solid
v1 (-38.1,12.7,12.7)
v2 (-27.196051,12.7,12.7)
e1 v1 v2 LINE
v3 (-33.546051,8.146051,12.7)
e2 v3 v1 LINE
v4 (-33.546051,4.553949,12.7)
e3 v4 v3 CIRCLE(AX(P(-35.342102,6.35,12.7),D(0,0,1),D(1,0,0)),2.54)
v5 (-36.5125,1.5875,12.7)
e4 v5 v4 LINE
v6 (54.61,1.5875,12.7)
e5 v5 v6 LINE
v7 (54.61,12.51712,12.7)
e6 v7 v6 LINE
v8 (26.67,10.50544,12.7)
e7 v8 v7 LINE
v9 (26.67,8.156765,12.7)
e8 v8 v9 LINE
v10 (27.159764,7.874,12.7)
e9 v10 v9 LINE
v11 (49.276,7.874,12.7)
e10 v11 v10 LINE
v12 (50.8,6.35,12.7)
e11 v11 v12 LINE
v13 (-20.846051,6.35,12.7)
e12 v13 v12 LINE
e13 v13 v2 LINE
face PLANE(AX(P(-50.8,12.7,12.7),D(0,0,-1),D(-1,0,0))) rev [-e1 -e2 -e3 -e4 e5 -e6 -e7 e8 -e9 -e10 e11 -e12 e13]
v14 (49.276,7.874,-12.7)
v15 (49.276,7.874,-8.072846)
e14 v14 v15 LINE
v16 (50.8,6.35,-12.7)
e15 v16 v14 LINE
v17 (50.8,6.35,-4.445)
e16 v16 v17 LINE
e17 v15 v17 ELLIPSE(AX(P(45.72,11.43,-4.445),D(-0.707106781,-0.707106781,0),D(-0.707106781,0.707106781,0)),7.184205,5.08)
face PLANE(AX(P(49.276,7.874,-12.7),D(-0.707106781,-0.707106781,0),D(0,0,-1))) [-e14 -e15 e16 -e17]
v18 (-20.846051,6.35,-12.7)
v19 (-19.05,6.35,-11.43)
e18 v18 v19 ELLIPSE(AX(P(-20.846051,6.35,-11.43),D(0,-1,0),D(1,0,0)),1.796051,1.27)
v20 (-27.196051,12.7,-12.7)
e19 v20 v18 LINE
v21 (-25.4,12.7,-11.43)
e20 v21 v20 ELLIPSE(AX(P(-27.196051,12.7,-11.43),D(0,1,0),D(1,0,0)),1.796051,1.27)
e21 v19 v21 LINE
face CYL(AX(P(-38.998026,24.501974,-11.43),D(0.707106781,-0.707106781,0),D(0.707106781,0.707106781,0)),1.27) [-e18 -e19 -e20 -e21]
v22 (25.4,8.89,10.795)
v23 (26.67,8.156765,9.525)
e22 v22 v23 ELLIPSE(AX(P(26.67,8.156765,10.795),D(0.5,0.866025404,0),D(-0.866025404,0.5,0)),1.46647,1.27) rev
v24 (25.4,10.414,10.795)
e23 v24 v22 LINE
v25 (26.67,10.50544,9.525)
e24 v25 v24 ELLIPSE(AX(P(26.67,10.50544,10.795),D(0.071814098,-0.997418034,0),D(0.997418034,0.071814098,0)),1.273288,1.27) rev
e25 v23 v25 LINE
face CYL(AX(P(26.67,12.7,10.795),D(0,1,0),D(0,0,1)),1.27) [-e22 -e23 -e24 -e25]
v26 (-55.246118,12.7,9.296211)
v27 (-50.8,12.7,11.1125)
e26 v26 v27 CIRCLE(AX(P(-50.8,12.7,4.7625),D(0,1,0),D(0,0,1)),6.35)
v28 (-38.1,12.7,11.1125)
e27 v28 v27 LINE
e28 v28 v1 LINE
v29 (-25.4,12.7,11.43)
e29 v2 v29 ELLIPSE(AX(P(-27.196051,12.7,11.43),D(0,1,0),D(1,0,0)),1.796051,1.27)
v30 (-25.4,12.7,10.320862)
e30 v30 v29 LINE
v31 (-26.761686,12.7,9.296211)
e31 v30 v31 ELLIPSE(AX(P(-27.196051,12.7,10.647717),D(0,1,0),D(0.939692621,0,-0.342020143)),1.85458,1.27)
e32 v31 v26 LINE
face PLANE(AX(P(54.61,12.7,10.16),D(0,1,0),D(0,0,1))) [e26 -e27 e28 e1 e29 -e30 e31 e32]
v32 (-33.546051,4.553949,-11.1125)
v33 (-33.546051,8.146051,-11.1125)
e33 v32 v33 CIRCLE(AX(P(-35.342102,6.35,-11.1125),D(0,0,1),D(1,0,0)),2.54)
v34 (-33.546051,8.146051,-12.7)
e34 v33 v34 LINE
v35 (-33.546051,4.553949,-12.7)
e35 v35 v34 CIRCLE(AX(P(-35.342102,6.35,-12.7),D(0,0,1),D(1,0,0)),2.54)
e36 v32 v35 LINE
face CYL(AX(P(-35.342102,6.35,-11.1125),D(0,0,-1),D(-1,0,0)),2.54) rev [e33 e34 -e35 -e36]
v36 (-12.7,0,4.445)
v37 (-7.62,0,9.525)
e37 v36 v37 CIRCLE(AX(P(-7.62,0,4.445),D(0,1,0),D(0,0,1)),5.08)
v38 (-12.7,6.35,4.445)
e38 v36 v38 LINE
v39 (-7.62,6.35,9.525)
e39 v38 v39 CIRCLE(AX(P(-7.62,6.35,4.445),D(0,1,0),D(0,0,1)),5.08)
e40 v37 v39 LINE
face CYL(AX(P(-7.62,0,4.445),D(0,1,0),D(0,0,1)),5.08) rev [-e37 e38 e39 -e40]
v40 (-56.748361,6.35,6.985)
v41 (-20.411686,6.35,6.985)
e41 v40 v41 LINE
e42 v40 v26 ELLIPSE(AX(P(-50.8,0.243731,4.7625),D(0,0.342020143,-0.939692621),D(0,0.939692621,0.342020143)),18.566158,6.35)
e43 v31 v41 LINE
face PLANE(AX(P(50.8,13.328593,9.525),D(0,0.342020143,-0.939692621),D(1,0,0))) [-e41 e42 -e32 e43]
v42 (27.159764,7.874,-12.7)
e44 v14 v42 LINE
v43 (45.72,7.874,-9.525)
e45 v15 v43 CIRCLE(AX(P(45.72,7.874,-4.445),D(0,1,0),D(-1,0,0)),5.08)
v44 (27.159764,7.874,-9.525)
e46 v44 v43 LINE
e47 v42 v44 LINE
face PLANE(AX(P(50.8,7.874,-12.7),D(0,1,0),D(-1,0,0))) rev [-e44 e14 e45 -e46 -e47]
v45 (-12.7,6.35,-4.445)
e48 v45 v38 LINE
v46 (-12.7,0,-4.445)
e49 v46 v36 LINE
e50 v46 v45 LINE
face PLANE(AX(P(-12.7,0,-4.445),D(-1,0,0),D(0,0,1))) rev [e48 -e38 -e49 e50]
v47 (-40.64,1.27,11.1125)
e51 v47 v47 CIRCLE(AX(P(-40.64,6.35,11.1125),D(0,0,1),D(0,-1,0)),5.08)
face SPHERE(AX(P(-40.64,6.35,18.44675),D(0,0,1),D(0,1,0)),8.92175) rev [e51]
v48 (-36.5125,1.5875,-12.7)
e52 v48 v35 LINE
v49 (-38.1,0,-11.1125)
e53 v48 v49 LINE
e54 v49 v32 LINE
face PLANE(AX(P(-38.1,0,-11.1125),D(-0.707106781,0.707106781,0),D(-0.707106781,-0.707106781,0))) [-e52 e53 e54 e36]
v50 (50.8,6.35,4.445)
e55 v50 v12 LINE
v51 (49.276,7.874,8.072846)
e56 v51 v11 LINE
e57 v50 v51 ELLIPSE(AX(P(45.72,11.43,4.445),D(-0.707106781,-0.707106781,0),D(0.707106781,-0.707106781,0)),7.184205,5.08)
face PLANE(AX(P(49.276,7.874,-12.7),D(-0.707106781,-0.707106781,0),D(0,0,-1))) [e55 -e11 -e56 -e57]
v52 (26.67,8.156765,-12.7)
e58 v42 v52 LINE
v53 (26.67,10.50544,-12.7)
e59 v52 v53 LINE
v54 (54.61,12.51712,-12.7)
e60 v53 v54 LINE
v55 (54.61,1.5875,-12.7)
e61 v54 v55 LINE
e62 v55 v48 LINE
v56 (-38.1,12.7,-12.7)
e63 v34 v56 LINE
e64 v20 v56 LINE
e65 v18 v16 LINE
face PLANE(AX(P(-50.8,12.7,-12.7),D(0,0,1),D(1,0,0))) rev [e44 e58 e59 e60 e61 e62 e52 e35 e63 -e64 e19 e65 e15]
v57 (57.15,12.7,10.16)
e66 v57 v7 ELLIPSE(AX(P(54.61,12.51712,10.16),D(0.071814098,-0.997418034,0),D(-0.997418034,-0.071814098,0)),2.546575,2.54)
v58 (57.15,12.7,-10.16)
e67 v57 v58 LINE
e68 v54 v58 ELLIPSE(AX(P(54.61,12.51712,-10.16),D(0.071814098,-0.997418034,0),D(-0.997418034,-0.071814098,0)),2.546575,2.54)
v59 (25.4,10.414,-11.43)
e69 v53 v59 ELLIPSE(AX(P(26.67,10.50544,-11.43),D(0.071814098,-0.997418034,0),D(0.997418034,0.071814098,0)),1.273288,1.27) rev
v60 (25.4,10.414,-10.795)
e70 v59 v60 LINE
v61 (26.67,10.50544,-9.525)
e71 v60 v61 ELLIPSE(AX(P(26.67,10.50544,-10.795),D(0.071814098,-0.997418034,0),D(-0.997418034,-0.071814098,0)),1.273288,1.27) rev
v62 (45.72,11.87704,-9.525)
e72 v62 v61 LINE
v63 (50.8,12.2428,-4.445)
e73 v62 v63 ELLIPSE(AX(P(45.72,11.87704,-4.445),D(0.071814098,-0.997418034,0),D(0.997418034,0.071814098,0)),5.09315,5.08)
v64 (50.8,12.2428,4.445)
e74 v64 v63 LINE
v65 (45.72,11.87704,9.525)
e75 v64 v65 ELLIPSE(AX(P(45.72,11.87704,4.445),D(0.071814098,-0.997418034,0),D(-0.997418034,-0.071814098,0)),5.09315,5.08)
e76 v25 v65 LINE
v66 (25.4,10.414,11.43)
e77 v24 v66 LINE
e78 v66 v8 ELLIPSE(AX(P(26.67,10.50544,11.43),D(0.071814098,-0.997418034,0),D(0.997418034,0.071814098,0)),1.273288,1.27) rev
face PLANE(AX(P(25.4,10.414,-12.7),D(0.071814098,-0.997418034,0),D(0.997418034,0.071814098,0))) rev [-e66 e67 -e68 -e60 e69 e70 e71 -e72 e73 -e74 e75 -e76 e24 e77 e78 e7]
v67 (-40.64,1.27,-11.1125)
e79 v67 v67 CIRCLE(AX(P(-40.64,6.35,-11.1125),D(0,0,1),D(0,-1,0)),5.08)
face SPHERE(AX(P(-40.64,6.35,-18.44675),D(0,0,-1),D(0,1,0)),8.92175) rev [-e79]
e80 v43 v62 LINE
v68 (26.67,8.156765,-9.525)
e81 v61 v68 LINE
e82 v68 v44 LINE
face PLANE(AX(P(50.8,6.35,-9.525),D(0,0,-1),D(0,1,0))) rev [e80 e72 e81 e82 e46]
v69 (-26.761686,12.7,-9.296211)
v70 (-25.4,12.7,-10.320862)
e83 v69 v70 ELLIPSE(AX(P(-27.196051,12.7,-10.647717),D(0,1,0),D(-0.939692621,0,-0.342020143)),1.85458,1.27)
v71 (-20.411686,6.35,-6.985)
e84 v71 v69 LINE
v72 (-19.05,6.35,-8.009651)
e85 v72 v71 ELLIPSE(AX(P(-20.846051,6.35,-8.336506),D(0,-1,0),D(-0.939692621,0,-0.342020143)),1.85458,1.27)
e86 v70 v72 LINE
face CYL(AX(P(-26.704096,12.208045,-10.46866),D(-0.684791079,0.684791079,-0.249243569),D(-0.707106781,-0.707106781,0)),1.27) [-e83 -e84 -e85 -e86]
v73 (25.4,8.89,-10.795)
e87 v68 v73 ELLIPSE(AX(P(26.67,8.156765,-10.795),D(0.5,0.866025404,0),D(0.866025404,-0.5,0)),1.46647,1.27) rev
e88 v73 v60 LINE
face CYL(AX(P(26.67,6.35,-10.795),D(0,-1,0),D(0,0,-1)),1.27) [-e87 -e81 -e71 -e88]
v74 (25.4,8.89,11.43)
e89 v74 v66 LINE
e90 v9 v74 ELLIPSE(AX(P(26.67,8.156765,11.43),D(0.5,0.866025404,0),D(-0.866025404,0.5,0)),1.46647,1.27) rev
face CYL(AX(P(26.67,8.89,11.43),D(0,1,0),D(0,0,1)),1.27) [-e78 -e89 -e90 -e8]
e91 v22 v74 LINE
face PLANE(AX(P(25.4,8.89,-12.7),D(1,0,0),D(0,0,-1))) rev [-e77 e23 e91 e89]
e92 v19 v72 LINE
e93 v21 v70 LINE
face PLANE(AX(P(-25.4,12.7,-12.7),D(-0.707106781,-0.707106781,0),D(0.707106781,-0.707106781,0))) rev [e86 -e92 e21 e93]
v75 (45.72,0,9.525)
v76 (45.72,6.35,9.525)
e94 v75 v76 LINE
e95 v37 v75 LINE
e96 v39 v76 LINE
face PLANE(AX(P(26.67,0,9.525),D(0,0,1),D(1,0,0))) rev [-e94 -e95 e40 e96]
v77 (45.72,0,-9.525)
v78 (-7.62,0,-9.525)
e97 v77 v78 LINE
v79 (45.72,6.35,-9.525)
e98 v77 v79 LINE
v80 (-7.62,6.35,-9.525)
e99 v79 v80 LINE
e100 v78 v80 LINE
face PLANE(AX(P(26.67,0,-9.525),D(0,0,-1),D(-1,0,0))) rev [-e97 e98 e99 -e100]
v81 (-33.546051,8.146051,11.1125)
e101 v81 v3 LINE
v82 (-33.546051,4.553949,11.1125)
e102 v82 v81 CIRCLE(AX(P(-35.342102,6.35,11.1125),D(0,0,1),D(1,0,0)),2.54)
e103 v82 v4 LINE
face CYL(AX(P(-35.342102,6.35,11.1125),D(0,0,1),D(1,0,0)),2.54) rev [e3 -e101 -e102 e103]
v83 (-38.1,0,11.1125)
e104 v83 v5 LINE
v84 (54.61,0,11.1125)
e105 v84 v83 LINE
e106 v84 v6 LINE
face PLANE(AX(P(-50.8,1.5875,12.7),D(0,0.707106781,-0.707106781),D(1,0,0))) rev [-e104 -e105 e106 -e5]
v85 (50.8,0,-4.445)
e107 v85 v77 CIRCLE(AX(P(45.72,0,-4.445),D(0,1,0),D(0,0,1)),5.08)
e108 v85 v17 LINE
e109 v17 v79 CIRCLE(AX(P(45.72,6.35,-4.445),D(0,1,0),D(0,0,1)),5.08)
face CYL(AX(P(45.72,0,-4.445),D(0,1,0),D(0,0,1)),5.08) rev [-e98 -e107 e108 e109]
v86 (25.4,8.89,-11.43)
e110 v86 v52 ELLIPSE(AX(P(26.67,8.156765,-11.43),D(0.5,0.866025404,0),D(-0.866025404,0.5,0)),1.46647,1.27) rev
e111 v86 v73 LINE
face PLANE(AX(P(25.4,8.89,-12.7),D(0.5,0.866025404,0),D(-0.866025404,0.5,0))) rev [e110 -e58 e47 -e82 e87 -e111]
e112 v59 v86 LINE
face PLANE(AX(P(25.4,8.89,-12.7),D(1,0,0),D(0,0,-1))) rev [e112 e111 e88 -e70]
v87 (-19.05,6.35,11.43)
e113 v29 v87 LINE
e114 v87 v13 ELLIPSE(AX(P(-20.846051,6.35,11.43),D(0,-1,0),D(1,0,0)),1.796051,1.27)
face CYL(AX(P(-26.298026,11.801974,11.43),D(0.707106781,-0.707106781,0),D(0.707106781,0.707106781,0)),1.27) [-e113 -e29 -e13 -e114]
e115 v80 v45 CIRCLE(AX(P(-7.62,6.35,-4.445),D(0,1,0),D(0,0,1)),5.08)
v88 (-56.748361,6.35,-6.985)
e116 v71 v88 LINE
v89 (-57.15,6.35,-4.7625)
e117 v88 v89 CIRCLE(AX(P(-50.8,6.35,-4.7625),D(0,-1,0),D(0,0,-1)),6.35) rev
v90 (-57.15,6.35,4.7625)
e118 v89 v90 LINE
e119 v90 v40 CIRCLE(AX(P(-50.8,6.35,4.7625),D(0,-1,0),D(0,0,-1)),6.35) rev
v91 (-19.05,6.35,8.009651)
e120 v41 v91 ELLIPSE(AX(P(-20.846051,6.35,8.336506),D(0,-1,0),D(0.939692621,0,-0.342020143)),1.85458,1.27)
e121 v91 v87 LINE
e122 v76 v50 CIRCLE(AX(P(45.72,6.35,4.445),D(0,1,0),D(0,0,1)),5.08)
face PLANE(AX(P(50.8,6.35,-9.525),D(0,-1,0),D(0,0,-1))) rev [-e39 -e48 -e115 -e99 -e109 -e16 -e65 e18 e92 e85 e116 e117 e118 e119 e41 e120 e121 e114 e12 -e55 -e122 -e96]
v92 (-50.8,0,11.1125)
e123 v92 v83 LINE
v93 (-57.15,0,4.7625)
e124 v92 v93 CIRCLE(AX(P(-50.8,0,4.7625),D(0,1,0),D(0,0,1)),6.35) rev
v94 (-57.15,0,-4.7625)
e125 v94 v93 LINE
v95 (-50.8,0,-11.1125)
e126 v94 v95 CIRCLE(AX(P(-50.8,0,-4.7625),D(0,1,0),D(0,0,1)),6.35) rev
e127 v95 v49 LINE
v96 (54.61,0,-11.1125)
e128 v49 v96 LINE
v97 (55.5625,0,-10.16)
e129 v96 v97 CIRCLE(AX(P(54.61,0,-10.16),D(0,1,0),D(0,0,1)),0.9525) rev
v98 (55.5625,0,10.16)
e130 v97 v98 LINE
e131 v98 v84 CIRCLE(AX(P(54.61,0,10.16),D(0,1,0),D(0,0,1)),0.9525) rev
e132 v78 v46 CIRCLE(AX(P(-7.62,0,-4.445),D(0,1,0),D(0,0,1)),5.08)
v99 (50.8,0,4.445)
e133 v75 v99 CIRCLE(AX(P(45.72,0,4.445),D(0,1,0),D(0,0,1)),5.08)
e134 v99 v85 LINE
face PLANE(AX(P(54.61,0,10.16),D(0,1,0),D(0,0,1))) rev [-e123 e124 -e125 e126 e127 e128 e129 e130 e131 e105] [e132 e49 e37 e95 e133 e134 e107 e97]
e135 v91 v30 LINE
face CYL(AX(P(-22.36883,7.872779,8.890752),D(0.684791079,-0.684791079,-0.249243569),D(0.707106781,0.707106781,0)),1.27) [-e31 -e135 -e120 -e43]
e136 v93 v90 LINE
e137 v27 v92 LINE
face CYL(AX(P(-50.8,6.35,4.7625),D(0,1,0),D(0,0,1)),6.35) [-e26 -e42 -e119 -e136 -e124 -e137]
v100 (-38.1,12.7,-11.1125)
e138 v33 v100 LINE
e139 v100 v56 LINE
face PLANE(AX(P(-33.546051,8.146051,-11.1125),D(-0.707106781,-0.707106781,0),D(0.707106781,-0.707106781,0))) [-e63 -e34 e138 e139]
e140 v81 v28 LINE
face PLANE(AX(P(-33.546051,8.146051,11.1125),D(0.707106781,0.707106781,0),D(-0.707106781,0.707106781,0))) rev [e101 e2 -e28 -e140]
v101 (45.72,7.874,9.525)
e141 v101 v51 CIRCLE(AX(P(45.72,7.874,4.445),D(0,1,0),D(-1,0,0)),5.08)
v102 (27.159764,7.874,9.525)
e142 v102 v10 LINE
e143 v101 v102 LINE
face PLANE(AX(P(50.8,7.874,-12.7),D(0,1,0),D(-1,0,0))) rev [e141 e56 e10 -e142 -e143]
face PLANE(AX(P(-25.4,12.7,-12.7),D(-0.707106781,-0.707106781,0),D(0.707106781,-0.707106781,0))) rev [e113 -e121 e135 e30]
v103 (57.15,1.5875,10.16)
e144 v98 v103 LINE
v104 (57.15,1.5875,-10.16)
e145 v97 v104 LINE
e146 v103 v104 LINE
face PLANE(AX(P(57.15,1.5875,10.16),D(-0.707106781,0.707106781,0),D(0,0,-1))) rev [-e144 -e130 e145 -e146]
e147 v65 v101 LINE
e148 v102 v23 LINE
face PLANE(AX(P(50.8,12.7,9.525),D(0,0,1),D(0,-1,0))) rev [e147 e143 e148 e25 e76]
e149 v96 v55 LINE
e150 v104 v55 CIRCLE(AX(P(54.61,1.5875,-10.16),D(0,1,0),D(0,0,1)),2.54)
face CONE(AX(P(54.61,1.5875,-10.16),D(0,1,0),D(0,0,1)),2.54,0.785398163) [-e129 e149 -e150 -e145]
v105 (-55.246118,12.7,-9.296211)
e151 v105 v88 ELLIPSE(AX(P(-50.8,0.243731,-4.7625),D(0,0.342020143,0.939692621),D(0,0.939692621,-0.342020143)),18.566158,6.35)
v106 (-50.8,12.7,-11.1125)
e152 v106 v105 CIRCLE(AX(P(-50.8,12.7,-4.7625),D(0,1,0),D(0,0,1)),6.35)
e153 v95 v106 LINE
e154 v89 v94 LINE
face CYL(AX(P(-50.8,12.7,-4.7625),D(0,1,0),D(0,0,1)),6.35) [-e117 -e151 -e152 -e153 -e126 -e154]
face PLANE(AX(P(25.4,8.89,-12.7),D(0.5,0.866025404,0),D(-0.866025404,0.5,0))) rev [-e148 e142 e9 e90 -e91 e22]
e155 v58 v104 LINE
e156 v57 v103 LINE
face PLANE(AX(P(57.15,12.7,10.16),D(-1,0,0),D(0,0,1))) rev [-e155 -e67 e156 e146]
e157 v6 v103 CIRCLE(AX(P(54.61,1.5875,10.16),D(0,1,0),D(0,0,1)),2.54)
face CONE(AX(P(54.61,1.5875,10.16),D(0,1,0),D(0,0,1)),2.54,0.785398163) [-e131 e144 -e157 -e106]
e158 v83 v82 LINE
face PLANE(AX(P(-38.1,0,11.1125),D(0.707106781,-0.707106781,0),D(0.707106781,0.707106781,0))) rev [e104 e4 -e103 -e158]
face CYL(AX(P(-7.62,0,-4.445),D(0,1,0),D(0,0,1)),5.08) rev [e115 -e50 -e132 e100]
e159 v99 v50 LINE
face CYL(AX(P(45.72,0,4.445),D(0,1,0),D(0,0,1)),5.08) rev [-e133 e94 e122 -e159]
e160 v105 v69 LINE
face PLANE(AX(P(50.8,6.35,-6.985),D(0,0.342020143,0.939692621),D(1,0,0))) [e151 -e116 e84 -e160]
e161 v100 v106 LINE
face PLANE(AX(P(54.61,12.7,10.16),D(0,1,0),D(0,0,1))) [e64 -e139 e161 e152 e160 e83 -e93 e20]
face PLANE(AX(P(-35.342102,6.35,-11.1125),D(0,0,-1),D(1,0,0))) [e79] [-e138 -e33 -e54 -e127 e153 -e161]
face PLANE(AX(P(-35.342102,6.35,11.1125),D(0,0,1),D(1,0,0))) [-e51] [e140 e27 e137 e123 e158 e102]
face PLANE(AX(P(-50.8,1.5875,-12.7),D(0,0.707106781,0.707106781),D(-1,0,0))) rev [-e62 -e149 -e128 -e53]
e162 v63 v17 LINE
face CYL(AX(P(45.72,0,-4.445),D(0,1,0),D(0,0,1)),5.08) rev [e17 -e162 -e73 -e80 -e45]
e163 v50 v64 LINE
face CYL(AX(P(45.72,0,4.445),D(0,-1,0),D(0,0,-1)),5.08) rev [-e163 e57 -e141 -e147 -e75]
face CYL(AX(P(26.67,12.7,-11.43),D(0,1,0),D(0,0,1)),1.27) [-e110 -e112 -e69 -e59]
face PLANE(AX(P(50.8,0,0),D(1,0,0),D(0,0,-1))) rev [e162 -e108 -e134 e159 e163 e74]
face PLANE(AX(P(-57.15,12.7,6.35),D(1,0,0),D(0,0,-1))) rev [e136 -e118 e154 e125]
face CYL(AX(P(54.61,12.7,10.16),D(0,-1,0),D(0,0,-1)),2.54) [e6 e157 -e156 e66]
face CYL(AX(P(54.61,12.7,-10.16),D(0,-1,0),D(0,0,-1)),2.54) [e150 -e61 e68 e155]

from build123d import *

# Parameters (mm, degrees)
BOSS_EXTRUDE1_DEPTH = 12.7
SKETCH2_W           = 19.05
SKETCH2_H           = 6.35
CUT_EXTRUDE1_DEPTH  = 107.95
CUT_EXTRUDE2_DEPTH  = 64.816710194
CHAMFER1_SIZE       = 6.978592645
CHAMFER1_SIZE_2     = 2.54
CUT_EXTRUDE3_DEPTH  = 1.5875
CHAMFER3_SIZE       = 1.5875
FILLET1_R           = 6.35
FILLET2_R           = 1.27
FILLET3_R           = 5.08
CHAMFER4_SIZE       = 1.524
CUT_EXTRUDE4_DEPTH  = 59.887477446


# Some blends are built 0.0001 mm under size
with BuildPart() as part:
    # Sketch1 → Boss-Extrude1 (new body)
    with BuildSketch(Plane(origin=(0, 0, 0), x_dir=(1, 0, 0), z_dir=(0, 1, 0))):
        with BuildLine():
            Line((-50.8, 12.7), (-57.15, 12.7))
            Line((-57.15, 12.7), (-57.15, 6.35))
            Line((-57.15, 6.35), (-57.15, -6.35))
            Line((-57.15, -6.35), (-57.15, -12.7))
            Line((-57.15, -12.7), (-50.8, -12.7))
            Line((-50.8, -12.7), (54.61, -12.7))
            ThreePointArc((54.61, -12.7), (56.406051224, -11.956051224), (57.15, -10.16))
            Line((57.15, -10.16), (57.15, 10.16))
            ThreePointArc((57.15, 10.16), (56.406051224, 11.956051224), (54.61, 12.7))
            Line((54.61, 12.7), (-50.8, 12.7))
        make_face()
    extrude(amount=BOSS_EXTRUDE1_DEPTH)

    # Sketch2 → Cut-Extrude1 (cut)
    with BuildSketch(Plane.ZY.offset(57.15)):
        with Locations((0, 9.525)):
            Rectangle(SKETCH2_W, SKETCH2_H)
    extrude(amount=-CUT_EXTRUDE1_DEPTH, mode=Mode.SUBTRACT)

    # Sketch3 → Cut-Extrude2 (cut, through all)
    with BuildSketch(Plane.XY.offset(12.7)):
        Polygon((25.4, 10.414), (57.15, 12.7), (-25.4, 12.7), (-19.05, 6.35), (50.8, 6.35), (50.8, 7.874), (27.15976362, 7.874), (25.4, 8.89), align=None)
    extrude(amount=-CUT_EXTRUDE2_DEPTH, mode=Mode.SUBTRACT)

    # Chamfer1
    # the kernel refuses this chamfer: 6.978592645, 2.54 mm, written as the material it adds along each edge
    with BuildSketch(Plane(origin=(-57.15, 6.35, 9.525), x_dir=(0, 0.9999130865277316, 0.013184058198642549), z_dir=(1, 0, 0))) as chamfer1_piece_1_section:
        Polygon((CHAMFER1_SIZE * 0.999913086587, -CHAMFER1_SIZE * 0.0131840581994), (-CHAMFER1_SIZE_2 * 0.0131840581987, -CHAMFER1_SIZE_2 * 0.999913086528), (0, 0), align=None)
    chamfer1_piece_1 = extrude(amount=56.203828281, mode=Mode.PRIVATE)
    chamfer1_piece_1 = split(chamfer1_piece_1, bisect_by=Plane(origin=(-39.199121236, 12.7, 8.706690515), z_dir=(0, -1, 0)), keep=Keep.TOP, mode=Mode.PRIVATE)
    chamfer1_piece_1 = split(chamfer1_piece_1, bisect_by=Plane(origin=(-30.223681853, 17.523681853, 8.706690515), z_dir=(-0.7071067811865448, -0.7071067811865503, 0)), keep=Keep.TOP, mode=Mode.PRIVATE)
    add(chamfer1_piece_1)
    with BuildSketch(Plane(origin=(-57.15, 6.35, -9.525), x_dir=(0, -0.09904090225207035, 0.9950833631817466), z_dir=(1, 0, 0))) as chamfer1_piece_2_section:
        Polygon((CHAMFER1_SIZE_2 * 0.995083363182, -CHAMFER1_SIZE_2 * 0.099040902252), (-CHAMFER1_SIZE * 0.099040902258, -CHAMFER1_SIZE * 0.995083363241), (0, 0), align=None)
    chamfer1_piece_2 = extrude(amount=56.203828281, mode=Mode.PRIVATE)
    chamfer1_piece_2 = split(chamfer1_piece_2, bisect_by=Plane(origin=(-30.223681853, 17.523681853, -8.706690515), z_dir=(-0.7071067811865448, -0.7071067811865503, 0)), keep=Keep.TOP, mode=Mode.PRIVATE)
    chamfer1_piece_2 = split(chamfer1_piece_2, bisect_by=Plane(origin=(-39.199121236, 12.7, -8.706690515), z_dir=(0, -1, 0)), keep=Keep.TOP, mode=Mode.PRIVATE)
    add(chamfer1_piece_2)

    # Sketch4 → Cut-Extrude3 (cut)
    with BuildSketch(Plane.XY.offset(12.7)):
        with BuildLine():
            Line((-57.15, 12.7), (-57.15, 0))
            Line((-57.15, 0), (-38.1, 0))
            Line((-38.1, 0), (-33.546051224, 4.553948776))
            ThreePointArc((-33.546051224, 4.553948776), (-32.802102448, 6.35), (-33.546051224, 8.146051224))
            Line((-33.546051224, 8.146051224), (-38.1, 12.7))
            Line((-38.1, 12.7), (-57.15, 12.7))
        make_face()
    cut_extrude3 = extrude(amount=-CUT_EXTRUDE3_DEPTH, mode=Mode.SUBTRACT)

    # Sketch6 → Cut-Revolve1 (revolve, cut)
    with BuildSketch(Plane.ZY.offset(40.64)):
        with BuildLine():
            Line((11.1125, 6.35), (11.1125, 11.43))
            ThreePointArc((11.1125, 11.43), (9.931118256, 9.01113492), (9.525, 6.35))
            Line((9.525, 6.35), (11.1125, 6.35))
        make_face()
    cut_revolve1 = revolve(axis=Axis((-40.64, 6.35, 12.7), (0, 0, -1)), mode=Mode.SUBTRACT)

    # Mirror1: Cut-Extrude3, Cut-Revolve1 across plane
    add(cut_extrude3.mirror(Plane(origin=(0, 0, 0), x_dir=(1, 0, 0), z_dir=(0, 0, -1))), mode=Mode.SUBTRACT)
    add(cut_revolve1.mirror(Plane(origin=(0, 0, 0), x_dir=(1, 0, 0), z_dir=(0, 0, -1))), mode=Mode.SUBTRACT)

    # Chamfer3
    chamfer3_edges = [part.edges().sort_by_distance(p)[0] for p in [
        (8.255, 0, 12.7),
        (56.406051224, 0, 11.956051224),
        (57.15, 0, 0),
        (56.406051224, 0, -11.956051224),
        (8.255, 0, -12.7),
    ]]
    chamfer(chamfer3_edges, length=CHAMFER3_SIZE)

    # Fillet1
    fillet1_edges = [part.edges().sort_by_distance(p)[0] for p in [
        (-57.15, 6.35, -11.1125),
        (-57.15, 6.35, 11.1125),
    ]]
    fillet(fillet1_edges, radius=FILLET1_R)

    # Fillet2
    fillet2_edges = [part.edges().sort_by_distance(p)[0] for p in [
        (-22.225, 9.525, 8.140605494),
        (-22.225, 9.525, -8.140605494),
        (25.4, 9.652, -9.525),
        (-22.225, 9.525, 12.7),
        (25.4, 9.652, 12.7),
        (25.4, 9.652, 9.525),
        (25.4, 9.652, -12.7),
        (-22.225, 9.525, -12.7),
    ]]
    fillet(fillet2_edges, radius=FILLET2_R)

    # Fillet3
    fillet3_edges = [part.edges().sort_by_distance(p)[0] for p in [
        (50.8, 10.0584, -9.525),
        (50.8, 10.0584, 9.525),
    ]]
    fillet(fillet3_edges, radius=FILLET3_R)

    # Chamfer4
    chamfer4_edges = [part.edges().sort_by_distance(p)[0] for p in [
        (50.8, 7.874, -8.5725),
        (50.8, 7.874, 8.5725),
    ]]
    chamfer(chamfer4_edges, length=CHAMFER4_SIZE - 0.0001)  # a hair under: the kernel refuses the full size

    # Sketch7 → Cut-Extrude4 (cut, through all)
    with BuildSketch(Plane(origin=(0, 6.35, 0), x_dir=(1, 0, 0), z_dir=(0, 1, 0))):
        with BuildLine():
            Line((26.67, -9.525), (45.72, -9.525))
            ThreePointArc((45.72, -9.525), (49.312102448, -8.037102448), (50.8, -4.445))
            Line((50.8, -4.445), (50.8, 4.445))
            ThreePointArc((50.8, 4.445), (49.312102448, 8.037102448), (45.72, 9.525))
            Line((45.72, 9.525), (26.67, 9.525))
            Line((26.67, 9.525), (-7.62, 9.525))
            ThreePointArc((-7.62, 9.525), (-11.212102448, 8.037102448), (-12.7, 4.445))
            Line((-12.7, 4.445), (-12.7, -4.445))
            ThreePointArc((-12.7, -4.445), (-11.212102448, -8.037102448), (-7.62, -9.525))
            Line((-7.62, -9.525), (26.67, -9.525))
        make_face()
    extrude(amount=-CUT_EXTRUDE4_DEPTH, mode=Mode.SUBTRACT)


solid = part.part
